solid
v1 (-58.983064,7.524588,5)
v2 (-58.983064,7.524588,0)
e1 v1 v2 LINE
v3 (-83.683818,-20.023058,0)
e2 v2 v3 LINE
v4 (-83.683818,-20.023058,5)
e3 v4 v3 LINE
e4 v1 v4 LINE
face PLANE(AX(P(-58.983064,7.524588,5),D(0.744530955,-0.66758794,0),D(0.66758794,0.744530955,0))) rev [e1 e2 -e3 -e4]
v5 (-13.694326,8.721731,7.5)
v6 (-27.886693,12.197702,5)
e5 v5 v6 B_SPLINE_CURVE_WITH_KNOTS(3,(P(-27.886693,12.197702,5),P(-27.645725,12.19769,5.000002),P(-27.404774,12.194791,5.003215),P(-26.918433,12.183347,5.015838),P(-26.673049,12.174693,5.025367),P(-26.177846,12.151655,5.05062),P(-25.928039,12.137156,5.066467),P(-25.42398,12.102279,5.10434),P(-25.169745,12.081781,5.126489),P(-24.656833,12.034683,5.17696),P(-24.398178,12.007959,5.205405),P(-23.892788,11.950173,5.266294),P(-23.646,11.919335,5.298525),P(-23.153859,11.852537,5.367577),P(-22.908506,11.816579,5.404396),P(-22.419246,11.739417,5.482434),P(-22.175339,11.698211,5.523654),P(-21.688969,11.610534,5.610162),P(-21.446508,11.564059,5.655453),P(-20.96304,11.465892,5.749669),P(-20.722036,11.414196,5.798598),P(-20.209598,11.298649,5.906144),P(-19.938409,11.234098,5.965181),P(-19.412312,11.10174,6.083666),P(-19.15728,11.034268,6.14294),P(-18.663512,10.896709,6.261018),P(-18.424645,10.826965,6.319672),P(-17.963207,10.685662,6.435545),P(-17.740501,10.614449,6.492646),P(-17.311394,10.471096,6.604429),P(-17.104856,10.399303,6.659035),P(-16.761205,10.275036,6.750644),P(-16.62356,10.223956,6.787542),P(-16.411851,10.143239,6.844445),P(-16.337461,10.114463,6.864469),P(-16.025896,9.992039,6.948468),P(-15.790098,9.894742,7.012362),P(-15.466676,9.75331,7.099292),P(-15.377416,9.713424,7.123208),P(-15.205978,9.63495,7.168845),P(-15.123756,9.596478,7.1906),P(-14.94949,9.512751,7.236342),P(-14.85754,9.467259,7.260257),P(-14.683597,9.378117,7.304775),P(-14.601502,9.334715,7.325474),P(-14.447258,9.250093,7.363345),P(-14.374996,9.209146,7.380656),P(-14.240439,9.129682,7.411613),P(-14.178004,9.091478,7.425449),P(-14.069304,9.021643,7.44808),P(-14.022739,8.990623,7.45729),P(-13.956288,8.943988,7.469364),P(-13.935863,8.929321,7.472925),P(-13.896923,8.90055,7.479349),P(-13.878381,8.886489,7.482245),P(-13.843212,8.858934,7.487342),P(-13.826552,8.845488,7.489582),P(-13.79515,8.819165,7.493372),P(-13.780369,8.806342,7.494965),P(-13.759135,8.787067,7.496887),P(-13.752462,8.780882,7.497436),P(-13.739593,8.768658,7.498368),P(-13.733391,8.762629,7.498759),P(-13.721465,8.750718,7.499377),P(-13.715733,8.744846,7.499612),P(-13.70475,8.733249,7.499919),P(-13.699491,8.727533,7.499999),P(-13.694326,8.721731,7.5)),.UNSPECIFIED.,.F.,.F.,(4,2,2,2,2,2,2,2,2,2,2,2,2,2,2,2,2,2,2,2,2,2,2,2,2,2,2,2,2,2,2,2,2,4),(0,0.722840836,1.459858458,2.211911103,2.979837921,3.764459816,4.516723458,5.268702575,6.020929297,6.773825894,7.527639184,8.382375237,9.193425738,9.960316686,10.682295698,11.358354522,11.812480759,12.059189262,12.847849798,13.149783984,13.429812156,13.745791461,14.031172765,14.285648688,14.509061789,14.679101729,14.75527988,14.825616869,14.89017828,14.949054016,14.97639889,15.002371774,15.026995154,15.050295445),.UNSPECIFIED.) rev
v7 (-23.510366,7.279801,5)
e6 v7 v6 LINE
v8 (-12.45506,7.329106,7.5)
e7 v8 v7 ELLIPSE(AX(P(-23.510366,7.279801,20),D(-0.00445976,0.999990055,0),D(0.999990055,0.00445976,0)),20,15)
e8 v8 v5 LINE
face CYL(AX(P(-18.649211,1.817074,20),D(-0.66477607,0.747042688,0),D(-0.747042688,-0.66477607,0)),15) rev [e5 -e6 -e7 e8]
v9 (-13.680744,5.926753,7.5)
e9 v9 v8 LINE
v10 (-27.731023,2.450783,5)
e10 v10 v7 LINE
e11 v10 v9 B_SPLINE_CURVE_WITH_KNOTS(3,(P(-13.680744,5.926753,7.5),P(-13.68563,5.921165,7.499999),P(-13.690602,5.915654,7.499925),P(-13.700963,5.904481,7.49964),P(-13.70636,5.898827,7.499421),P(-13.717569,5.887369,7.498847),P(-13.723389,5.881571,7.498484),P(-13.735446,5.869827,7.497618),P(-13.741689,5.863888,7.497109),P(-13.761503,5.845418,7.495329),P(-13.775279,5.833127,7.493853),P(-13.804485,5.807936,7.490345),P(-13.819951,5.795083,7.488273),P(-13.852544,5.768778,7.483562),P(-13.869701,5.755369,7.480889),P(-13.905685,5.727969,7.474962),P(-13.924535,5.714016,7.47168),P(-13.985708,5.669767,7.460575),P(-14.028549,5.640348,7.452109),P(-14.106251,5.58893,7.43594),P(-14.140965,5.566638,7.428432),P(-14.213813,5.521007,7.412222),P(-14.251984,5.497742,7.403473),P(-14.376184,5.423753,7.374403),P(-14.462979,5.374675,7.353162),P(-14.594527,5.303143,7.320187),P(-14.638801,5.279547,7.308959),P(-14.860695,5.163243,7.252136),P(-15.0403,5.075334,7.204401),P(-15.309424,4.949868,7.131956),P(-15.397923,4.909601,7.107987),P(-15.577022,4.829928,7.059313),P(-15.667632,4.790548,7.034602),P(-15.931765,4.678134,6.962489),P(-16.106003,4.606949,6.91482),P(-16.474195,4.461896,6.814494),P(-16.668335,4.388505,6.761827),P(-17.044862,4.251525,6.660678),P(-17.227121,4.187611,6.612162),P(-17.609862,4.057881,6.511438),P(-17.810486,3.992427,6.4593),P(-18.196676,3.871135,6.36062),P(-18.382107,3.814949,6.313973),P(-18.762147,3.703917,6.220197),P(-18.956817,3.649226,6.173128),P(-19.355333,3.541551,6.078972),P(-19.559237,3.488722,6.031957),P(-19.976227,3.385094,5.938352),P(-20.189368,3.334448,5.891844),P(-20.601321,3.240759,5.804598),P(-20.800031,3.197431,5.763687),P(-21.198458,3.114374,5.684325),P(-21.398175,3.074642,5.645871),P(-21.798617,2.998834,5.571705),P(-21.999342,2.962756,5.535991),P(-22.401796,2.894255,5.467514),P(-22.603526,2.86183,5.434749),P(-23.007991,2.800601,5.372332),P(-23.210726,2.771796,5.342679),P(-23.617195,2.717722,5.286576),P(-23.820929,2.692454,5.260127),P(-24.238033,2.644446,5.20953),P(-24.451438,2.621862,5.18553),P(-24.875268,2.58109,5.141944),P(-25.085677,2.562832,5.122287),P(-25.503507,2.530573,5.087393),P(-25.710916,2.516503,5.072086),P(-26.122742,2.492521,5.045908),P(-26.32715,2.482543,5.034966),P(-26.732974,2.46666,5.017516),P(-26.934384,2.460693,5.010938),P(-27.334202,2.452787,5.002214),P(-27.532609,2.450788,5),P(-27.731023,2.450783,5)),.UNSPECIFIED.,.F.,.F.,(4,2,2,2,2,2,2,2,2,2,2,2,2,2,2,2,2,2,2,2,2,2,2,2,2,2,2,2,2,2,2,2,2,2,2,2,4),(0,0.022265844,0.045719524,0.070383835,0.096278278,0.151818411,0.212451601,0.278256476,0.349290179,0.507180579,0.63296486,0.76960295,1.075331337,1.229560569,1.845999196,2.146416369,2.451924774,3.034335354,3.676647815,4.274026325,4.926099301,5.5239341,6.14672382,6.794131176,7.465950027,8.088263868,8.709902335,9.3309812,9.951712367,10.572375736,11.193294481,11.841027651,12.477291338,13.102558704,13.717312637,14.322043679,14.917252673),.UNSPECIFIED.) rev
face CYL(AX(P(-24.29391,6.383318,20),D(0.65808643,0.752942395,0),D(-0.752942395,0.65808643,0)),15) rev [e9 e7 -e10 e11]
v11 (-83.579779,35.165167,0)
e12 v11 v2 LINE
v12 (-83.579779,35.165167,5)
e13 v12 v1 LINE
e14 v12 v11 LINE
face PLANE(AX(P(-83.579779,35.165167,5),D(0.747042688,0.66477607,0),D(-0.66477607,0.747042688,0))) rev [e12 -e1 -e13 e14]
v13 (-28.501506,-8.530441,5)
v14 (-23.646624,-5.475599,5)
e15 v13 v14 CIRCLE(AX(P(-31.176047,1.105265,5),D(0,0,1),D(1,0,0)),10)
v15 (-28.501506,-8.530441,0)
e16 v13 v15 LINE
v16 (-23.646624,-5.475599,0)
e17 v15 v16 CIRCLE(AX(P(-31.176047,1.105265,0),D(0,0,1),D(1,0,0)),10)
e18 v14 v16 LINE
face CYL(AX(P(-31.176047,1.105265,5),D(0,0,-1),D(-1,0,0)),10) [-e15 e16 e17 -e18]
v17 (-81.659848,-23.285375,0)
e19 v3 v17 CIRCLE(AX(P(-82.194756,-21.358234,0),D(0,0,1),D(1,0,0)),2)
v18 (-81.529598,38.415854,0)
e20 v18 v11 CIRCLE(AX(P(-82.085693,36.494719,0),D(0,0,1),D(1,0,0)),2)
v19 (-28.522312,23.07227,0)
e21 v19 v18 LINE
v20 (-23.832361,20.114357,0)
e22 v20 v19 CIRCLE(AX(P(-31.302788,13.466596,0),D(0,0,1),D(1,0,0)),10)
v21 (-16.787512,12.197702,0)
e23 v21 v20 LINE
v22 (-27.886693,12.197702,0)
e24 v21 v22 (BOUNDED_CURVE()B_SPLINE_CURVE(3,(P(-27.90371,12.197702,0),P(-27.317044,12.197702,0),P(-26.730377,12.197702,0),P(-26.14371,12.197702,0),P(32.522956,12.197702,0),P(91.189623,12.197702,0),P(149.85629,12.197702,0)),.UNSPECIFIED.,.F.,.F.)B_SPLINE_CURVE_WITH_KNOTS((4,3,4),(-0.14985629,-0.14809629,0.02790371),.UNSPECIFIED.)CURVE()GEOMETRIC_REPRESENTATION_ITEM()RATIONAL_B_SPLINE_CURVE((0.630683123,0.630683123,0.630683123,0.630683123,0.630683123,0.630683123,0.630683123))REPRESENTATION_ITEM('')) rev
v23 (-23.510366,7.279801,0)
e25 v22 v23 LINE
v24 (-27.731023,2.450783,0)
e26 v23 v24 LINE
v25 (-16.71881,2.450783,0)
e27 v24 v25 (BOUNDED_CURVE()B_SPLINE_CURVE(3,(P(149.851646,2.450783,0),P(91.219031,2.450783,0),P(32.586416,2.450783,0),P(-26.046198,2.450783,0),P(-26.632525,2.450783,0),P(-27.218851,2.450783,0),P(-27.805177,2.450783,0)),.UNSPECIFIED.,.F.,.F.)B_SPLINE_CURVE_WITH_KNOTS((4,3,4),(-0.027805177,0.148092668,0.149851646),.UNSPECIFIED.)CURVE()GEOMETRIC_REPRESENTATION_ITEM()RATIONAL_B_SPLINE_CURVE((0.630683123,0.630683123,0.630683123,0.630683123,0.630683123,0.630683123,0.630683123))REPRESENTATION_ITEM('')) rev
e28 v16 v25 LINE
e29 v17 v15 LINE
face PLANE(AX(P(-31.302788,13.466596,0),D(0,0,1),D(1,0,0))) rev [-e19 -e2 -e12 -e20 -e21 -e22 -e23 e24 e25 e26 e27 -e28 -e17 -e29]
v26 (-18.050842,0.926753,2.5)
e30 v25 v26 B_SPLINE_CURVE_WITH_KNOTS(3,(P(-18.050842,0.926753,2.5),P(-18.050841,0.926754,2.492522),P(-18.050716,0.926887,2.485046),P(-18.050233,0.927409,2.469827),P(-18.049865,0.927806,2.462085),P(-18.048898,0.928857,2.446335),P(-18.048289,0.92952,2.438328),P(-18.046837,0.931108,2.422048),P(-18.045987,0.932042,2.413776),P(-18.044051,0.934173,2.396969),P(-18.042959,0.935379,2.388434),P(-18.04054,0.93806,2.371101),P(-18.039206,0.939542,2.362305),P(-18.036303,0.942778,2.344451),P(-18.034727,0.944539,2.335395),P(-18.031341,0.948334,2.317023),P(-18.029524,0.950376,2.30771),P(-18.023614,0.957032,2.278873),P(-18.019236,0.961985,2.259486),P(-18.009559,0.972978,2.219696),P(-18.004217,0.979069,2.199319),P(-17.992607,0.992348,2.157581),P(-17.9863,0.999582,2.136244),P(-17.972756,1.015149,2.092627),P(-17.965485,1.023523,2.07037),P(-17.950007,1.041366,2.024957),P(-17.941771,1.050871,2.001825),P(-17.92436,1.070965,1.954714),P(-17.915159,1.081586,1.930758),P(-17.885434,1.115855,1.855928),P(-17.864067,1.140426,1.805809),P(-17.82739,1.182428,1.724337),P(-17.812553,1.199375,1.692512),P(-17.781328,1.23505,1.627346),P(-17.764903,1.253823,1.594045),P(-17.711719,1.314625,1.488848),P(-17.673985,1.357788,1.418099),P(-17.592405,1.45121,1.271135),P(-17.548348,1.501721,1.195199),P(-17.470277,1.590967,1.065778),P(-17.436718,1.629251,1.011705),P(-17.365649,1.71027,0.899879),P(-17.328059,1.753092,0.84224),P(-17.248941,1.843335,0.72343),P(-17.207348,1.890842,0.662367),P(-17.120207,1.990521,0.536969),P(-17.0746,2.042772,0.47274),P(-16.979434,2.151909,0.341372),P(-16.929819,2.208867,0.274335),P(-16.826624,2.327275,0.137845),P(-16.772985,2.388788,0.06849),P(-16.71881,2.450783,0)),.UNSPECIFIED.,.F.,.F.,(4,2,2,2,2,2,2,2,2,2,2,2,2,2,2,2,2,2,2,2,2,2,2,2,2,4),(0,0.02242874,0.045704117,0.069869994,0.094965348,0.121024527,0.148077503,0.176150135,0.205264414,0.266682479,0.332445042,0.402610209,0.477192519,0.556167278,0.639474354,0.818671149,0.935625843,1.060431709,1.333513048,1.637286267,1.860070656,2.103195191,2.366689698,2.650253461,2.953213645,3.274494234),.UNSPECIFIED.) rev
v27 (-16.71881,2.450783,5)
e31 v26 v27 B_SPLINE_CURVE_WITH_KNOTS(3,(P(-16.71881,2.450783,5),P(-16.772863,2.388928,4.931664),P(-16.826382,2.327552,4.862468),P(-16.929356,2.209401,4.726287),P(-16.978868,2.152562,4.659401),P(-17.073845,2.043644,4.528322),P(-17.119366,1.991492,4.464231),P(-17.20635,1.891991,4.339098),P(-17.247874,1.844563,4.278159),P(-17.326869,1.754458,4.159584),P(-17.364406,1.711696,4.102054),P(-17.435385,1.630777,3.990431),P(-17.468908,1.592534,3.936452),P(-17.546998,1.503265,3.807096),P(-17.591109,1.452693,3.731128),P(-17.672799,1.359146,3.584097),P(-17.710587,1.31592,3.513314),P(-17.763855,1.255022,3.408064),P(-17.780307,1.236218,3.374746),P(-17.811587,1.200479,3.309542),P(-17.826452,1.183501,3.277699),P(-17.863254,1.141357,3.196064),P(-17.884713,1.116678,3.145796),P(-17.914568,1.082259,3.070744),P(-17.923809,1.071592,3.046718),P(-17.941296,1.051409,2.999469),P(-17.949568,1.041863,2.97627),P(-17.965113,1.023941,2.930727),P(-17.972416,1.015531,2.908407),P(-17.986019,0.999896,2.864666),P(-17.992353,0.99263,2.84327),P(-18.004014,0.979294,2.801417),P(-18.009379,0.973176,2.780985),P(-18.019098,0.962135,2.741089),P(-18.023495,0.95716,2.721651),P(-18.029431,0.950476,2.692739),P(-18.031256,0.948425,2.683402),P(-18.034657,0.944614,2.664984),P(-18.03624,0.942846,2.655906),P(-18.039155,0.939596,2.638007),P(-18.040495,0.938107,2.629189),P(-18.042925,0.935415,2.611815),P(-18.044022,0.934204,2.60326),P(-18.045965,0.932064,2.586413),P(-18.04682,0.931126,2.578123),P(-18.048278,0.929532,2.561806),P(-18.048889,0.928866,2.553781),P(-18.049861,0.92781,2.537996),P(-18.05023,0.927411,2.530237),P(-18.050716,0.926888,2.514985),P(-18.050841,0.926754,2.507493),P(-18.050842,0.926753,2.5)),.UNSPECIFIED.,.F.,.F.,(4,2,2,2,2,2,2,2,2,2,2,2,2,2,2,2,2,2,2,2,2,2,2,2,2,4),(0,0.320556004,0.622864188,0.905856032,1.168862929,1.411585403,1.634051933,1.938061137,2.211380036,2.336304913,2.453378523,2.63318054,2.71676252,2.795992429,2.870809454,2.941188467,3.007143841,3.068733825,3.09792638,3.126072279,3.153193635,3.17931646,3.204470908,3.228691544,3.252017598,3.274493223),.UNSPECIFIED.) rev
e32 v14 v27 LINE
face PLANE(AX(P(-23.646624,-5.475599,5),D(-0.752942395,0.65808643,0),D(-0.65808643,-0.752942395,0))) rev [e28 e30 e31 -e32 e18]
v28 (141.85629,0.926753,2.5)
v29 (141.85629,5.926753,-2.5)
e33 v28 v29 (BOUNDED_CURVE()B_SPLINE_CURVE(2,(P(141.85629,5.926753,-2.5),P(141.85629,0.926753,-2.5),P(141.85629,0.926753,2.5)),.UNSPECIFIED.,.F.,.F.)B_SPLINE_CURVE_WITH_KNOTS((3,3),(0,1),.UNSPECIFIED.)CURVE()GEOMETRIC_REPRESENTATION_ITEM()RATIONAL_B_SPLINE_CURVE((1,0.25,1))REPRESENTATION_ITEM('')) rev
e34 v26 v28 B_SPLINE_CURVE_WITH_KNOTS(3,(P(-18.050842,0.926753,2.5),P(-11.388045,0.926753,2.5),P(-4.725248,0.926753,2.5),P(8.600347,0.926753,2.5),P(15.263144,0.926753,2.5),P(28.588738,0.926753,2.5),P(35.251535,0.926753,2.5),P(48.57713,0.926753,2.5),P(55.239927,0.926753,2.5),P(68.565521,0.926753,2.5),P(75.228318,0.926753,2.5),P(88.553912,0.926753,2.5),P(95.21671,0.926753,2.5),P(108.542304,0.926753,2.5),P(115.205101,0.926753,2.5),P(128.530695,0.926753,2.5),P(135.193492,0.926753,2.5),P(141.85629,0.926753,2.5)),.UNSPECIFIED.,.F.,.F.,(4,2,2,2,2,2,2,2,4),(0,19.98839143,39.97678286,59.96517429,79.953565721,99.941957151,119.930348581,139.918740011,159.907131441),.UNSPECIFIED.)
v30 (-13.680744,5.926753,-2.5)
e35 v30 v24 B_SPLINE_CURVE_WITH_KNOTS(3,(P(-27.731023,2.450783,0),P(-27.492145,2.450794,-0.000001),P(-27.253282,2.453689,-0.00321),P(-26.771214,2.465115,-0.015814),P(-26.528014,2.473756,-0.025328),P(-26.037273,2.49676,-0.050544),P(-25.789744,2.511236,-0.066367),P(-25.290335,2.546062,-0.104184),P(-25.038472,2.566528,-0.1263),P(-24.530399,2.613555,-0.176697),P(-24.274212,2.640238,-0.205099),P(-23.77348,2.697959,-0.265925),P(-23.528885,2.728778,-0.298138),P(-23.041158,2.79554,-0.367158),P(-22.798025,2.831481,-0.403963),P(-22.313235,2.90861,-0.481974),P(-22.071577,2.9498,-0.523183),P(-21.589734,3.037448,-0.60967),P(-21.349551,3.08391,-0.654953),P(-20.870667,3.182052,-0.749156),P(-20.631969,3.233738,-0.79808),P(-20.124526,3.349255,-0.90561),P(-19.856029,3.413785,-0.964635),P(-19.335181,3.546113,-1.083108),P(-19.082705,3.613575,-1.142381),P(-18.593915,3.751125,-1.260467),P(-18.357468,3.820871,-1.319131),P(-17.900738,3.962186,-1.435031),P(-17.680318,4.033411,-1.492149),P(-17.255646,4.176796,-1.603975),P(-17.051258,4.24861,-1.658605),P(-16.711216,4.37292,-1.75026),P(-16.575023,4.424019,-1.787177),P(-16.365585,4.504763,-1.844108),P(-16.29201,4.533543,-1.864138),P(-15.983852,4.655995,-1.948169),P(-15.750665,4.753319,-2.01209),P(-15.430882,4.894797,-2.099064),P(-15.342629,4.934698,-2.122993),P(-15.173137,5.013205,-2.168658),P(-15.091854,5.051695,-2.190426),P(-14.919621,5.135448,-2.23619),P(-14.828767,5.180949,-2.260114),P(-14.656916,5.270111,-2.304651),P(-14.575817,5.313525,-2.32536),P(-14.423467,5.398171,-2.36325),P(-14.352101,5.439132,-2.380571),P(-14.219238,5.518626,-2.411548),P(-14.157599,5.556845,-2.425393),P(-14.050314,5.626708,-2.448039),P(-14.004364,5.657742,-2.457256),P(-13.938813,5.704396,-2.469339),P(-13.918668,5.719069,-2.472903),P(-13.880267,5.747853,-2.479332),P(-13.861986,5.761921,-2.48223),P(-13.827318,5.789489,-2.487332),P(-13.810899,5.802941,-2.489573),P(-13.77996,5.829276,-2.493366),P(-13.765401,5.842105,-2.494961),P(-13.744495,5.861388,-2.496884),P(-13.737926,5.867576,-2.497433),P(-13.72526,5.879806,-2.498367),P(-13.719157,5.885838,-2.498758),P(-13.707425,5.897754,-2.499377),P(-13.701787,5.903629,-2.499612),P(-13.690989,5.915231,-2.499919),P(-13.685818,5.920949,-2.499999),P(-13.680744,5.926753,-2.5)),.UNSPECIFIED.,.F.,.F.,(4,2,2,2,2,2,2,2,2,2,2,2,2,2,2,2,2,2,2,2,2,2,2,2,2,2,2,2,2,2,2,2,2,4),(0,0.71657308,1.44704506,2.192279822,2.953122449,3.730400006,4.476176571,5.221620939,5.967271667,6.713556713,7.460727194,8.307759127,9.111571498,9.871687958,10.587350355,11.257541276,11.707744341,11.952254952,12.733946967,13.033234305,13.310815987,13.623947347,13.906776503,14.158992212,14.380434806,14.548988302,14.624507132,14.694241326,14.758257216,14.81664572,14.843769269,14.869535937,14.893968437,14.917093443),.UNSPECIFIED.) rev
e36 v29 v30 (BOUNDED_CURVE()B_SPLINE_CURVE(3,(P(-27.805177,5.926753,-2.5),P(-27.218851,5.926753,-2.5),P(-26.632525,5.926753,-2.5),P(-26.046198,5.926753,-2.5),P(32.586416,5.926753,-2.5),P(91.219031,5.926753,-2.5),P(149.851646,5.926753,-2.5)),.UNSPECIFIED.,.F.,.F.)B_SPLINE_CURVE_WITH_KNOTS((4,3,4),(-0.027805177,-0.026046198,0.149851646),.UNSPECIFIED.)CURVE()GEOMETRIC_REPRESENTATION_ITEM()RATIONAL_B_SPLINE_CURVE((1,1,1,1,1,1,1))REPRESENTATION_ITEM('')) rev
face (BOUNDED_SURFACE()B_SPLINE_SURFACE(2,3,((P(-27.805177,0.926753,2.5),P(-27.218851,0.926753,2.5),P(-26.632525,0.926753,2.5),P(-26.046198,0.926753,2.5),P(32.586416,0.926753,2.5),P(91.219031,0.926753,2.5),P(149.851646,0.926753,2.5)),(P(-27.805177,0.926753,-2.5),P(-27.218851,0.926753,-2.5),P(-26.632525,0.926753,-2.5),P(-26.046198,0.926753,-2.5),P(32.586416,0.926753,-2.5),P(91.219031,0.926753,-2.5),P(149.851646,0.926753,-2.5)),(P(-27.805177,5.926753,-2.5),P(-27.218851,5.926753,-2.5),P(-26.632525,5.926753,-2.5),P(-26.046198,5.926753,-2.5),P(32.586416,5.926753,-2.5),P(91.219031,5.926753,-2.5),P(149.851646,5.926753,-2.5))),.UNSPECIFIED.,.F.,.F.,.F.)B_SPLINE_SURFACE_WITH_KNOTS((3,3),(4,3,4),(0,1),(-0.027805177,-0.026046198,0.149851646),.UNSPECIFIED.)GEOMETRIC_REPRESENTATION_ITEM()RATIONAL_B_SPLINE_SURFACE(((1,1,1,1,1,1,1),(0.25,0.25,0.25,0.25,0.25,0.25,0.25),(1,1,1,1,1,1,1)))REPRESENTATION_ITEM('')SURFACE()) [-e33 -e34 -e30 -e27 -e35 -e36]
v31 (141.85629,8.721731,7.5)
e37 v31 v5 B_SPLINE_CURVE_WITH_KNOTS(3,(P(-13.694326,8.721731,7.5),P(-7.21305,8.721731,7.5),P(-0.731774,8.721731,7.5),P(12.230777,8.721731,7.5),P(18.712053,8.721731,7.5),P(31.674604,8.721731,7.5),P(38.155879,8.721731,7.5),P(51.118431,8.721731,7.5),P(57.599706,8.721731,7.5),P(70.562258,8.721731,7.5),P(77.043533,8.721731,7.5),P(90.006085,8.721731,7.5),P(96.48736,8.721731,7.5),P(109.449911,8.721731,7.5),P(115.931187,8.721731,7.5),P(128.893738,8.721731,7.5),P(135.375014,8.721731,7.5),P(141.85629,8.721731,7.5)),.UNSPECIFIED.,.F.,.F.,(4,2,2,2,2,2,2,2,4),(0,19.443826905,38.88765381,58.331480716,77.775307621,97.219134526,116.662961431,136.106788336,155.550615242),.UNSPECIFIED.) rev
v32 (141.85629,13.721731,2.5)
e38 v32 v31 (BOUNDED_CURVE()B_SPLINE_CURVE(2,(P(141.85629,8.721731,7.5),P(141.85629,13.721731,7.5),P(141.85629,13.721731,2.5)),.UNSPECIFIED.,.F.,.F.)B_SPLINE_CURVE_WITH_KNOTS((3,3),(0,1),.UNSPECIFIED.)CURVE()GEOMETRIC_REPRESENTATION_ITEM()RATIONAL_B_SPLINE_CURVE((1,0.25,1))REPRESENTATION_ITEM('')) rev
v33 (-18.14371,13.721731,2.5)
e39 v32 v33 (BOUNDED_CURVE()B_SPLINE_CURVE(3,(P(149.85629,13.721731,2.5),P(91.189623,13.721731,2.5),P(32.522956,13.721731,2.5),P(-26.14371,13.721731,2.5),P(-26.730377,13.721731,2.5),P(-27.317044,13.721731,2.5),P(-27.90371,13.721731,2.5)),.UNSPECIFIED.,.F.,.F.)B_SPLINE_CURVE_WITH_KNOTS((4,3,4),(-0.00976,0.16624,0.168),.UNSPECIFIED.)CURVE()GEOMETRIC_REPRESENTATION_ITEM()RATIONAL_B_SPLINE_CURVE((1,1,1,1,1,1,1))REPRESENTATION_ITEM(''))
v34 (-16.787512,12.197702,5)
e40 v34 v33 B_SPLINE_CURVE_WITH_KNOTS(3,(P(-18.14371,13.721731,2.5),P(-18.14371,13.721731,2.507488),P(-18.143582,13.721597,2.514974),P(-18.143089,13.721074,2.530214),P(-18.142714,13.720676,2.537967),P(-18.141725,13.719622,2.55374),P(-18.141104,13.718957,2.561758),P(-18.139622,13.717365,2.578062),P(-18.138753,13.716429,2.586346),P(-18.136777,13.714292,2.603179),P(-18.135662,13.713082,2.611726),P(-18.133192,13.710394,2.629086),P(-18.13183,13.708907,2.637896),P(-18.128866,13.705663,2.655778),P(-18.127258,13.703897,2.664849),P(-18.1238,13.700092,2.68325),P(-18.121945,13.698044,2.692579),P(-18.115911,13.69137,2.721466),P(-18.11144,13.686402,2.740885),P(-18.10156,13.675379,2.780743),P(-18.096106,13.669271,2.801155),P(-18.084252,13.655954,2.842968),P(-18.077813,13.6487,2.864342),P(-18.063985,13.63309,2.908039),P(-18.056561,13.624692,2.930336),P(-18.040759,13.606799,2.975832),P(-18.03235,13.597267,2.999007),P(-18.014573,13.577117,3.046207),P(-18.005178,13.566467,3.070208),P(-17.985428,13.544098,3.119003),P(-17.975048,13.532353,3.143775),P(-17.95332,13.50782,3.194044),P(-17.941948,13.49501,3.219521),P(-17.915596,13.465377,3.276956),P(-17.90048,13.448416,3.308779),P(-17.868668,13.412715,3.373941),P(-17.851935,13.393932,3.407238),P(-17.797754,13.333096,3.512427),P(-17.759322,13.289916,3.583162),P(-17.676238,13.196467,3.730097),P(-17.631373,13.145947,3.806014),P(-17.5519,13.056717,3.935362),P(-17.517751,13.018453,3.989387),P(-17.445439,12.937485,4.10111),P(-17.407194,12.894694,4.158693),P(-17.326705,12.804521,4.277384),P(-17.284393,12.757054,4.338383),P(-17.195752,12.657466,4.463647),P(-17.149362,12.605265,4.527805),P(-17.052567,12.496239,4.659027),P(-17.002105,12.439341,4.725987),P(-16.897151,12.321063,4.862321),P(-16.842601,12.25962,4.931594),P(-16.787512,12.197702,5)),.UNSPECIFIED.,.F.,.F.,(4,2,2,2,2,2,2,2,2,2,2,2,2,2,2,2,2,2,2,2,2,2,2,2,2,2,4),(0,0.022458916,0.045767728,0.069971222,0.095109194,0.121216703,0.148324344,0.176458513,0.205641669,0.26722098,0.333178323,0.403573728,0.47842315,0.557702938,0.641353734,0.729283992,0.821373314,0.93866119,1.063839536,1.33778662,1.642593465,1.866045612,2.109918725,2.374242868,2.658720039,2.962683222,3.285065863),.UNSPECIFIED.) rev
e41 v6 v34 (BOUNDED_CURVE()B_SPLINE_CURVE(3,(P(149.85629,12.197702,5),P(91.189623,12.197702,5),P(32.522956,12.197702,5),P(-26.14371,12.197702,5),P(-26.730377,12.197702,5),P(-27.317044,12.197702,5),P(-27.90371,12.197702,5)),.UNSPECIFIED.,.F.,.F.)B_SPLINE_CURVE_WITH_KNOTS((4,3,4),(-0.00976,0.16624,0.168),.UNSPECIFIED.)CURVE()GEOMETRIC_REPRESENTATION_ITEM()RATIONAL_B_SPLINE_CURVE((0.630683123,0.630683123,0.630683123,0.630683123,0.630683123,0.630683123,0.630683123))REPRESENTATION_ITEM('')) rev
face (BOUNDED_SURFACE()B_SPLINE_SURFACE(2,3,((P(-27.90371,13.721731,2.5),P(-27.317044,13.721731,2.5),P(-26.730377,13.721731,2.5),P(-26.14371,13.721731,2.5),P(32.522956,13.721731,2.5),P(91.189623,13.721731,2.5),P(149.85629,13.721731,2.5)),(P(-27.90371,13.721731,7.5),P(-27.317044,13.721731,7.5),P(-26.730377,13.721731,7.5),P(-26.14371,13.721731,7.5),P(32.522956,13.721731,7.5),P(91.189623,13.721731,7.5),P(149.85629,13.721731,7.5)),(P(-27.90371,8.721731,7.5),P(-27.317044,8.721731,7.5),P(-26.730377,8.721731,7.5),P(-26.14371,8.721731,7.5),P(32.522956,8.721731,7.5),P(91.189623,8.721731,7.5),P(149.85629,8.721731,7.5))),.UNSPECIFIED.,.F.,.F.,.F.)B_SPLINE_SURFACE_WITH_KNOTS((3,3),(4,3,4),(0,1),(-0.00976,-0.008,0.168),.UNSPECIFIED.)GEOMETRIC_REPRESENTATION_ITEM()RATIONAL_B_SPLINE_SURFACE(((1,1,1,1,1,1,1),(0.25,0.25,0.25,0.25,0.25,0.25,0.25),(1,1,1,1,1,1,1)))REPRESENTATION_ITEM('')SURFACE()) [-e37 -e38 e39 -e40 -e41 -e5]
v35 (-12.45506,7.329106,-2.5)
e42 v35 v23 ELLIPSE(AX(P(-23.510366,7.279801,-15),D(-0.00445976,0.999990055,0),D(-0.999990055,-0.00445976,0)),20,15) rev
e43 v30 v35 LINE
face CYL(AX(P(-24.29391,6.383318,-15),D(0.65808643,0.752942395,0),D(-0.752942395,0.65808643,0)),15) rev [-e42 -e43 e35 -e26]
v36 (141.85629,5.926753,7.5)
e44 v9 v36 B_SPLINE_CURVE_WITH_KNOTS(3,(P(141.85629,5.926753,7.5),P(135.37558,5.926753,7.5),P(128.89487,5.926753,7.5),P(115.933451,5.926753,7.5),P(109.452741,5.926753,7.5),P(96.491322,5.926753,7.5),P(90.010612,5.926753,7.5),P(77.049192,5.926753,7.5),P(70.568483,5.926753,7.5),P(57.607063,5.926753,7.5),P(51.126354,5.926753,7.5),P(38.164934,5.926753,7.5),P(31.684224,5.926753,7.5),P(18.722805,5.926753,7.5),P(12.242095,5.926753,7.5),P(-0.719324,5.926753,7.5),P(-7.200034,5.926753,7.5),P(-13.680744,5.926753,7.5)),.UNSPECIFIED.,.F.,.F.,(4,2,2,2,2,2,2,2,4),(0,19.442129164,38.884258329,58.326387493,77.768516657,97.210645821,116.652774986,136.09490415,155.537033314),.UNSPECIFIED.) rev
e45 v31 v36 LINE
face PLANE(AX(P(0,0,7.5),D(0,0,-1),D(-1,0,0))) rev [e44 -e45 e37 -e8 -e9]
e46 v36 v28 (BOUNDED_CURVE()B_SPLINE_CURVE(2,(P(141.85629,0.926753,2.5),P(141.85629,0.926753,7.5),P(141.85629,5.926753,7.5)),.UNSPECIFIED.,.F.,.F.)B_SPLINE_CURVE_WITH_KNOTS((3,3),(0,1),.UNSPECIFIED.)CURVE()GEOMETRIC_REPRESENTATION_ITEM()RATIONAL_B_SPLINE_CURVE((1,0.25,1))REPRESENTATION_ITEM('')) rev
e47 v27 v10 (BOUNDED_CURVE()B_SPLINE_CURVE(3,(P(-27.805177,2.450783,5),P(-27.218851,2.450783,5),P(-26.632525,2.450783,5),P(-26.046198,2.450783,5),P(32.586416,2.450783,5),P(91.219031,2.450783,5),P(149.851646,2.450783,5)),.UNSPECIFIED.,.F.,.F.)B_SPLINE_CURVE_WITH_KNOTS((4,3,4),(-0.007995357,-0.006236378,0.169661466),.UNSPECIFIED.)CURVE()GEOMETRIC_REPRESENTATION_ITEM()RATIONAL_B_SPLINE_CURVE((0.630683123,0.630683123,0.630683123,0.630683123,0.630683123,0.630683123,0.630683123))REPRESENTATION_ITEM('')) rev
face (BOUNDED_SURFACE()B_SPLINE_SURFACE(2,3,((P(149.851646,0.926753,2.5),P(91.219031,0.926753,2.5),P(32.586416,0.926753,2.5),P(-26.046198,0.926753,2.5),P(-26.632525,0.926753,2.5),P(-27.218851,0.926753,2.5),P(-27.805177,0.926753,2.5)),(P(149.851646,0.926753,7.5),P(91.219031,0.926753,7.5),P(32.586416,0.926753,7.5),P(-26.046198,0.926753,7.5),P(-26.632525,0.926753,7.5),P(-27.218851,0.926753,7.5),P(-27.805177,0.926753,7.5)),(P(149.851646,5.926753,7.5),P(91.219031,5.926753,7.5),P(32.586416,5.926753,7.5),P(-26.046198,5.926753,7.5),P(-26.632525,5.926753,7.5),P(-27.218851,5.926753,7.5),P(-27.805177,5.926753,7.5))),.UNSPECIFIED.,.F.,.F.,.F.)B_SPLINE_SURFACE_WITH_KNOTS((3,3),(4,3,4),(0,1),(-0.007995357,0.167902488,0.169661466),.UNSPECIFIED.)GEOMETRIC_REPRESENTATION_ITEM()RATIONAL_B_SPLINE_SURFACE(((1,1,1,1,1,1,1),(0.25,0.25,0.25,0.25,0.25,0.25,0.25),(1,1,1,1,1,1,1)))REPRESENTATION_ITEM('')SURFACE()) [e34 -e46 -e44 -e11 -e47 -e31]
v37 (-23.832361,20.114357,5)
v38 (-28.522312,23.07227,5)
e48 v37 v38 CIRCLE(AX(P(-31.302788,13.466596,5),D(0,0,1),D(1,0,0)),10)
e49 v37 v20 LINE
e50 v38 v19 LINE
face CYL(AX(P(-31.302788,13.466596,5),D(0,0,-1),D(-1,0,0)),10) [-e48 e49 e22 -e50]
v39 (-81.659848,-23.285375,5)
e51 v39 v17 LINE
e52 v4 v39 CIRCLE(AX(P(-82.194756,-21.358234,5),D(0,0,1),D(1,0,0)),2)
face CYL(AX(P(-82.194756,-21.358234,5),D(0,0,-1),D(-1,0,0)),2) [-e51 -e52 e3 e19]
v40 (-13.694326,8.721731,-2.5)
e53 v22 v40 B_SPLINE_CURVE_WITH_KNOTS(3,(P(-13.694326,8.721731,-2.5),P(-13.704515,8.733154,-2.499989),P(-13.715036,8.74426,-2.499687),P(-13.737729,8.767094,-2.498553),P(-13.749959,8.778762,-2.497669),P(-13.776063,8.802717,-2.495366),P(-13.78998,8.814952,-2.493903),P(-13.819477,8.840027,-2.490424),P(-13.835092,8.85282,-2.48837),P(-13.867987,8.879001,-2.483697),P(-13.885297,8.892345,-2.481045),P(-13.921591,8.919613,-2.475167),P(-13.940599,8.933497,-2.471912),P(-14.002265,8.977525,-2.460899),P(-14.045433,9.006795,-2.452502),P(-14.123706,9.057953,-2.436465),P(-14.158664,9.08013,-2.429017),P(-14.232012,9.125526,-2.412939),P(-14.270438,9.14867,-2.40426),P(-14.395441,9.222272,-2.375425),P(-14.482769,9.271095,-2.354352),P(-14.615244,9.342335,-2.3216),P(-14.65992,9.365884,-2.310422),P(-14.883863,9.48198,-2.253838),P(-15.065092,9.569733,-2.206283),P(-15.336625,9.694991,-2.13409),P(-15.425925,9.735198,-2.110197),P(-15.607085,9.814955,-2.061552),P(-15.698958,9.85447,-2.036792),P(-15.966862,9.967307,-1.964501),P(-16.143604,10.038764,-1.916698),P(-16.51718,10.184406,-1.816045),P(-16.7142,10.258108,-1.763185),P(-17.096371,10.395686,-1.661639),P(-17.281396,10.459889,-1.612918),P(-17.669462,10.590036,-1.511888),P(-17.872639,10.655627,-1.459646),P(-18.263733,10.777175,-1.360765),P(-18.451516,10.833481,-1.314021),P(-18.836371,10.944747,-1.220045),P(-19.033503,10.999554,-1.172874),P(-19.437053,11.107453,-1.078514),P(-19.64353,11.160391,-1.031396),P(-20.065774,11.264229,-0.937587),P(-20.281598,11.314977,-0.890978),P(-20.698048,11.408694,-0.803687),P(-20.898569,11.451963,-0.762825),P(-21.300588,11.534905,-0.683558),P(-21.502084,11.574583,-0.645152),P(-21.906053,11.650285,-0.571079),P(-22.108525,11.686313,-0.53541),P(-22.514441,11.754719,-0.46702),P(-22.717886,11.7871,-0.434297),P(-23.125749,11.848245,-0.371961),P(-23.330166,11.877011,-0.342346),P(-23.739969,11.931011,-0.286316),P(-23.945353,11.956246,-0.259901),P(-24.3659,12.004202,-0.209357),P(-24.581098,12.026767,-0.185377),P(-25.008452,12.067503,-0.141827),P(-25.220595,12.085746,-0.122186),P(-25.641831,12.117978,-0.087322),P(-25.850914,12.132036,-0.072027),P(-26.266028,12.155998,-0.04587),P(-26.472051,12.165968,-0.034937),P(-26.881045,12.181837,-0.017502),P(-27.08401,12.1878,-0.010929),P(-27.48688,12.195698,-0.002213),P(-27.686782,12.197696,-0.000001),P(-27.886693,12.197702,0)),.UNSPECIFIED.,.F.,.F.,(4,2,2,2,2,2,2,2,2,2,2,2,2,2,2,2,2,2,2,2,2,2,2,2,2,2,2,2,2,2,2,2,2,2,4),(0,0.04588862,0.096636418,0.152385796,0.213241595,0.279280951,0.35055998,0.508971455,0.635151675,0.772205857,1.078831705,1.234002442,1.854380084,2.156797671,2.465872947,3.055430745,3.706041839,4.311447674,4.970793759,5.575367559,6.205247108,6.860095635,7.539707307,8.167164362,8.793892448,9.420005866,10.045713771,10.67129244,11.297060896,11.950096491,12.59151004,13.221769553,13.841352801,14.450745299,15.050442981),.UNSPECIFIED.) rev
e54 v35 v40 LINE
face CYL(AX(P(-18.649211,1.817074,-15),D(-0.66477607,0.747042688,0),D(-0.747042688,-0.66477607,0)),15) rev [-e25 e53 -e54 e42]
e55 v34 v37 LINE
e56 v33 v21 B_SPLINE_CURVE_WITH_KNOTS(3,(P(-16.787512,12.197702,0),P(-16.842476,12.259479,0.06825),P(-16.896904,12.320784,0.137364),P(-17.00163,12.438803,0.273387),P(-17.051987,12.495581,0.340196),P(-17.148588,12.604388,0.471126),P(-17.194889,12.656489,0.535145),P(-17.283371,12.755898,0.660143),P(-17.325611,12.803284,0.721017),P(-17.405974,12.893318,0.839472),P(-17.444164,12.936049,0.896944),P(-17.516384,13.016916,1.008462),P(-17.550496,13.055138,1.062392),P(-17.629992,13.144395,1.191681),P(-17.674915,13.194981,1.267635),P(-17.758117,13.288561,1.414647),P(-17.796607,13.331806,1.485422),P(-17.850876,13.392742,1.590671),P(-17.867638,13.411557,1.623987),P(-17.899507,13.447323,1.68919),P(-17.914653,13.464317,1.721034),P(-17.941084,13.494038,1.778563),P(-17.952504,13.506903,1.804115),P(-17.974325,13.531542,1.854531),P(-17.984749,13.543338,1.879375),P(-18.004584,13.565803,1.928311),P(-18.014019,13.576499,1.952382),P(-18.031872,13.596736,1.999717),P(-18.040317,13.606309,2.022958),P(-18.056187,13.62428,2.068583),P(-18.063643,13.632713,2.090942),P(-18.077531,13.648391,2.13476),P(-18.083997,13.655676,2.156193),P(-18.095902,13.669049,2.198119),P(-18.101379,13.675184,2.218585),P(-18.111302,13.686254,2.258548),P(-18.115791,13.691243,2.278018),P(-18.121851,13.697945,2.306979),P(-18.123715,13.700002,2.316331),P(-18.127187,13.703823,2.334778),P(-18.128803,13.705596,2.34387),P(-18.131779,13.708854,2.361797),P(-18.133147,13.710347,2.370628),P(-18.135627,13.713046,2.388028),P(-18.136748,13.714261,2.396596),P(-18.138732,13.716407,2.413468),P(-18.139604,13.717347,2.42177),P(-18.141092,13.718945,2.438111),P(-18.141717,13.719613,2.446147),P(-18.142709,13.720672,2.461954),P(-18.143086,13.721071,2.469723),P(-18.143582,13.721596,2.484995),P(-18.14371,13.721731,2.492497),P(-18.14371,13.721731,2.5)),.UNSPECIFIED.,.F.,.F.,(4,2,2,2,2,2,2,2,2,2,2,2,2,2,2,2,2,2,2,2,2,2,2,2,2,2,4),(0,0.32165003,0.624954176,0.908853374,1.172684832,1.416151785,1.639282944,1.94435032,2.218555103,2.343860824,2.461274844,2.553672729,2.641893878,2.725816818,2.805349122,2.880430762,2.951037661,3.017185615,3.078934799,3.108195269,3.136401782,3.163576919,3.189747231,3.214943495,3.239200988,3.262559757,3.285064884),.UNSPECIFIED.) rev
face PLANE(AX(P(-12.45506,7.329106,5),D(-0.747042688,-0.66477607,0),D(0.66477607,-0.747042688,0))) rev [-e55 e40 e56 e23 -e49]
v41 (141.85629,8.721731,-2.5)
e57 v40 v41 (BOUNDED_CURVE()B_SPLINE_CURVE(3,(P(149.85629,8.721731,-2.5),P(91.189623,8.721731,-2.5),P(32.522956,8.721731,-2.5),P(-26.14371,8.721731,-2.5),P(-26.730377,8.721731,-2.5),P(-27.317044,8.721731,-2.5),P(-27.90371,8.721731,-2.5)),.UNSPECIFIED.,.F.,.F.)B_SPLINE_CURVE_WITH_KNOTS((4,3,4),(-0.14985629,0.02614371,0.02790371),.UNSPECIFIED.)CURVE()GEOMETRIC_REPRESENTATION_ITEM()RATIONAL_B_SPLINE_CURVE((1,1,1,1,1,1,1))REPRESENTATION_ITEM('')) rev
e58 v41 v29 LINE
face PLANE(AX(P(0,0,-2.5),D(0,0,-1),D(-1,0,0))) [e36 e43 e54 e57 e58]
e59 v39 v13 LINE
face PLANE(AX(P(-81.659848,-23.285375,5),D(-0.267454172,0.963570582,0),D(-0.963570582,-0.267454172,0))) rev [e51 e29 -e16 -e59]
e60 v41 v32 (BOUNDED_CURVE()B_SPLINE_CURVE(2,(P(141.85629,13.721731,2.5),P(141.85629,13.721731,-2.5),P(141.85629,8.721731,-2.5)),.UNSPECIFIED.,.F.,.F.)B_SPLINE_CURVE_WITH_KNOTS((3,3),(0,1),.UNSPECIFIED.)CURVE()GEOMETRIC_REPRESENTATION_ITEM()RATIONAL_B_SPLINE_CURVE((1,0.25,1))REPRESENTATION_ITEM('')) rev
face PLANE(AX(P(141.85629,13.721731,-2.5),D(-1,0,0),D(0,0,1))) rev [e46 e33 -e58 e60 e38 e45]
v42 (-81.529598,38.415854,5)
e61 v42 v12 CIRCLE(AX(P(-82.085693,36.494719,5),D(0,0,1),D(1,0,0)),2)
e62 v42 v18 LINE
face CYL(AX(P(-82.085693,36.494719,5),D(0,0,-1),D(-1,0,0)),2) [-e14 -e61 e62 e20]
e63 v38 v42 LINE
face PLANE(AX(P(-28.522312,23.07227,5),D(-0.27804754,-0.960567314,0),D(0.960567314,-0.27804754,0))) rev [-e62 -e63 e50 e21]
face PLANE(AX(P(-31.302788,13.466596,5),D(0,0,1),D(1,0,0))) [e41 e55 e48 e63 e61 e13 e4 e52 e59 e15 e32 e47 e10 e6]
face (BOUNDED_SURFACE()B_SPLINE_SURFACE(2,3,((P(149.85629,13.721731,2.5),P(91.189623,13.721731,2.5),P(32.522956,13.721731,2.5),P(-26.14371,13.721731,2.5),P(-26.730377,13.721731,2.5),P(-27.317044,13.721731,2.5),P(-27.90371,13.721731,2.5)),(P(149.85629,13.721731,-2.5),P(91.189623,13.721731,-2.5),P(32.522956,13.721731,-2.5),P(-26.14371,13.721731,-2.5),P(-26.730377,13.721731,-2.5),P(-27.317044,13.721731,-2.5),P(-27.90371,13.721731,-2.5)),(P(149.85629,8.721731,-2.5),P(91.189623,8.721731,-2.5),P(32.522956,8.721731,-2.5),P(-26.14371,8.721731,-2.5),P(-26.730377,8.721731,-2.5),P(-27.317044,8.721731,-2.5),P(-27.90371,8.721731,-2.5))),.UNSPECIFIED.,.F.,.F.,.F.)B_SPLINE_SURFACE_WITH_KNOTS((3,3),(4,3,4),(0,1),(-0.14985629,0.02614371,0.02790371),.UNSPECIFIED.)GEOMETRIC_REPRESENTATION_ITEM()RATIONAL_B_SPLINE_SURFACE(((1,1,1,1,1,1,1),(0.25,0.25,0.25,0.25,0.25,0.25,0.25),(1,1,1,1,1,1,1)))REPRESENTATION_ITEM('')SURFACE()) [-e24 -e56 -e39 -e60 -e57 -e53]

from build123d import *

# Parameters (mm, degrees)
BOSS_EXTRU_1_DEPTH = 5
BOSS_EXTRU_3_START = 7.5
BOSS_EXTRU_3_DEPTH = 10
CONG_8_R           = 15
CONG_9_SIZE        = 5


with BuildPart() as part:
    # Esquisse1 → Boss.-Extru.1 (new body)
    with BuildSketch(Plane.XY):
        with BuildLine():
            Line((-12.455060077, 7.329105625), (-23.832360657, 20.114357067))
            ThreePointArc((-23.832360657, 20.114357067), (-25.968224675, 21.924872738), (-28.522312132, 23.072269514))
            Line((-28.522312132, 23.072269514), (-81.529598126, 38.415853733))
            ThreePointArc((-81.529598126, 38.415853733), (-83.77734848, 37.561631676), (-83.579778581, 35.165166965))
            Line((-83.579778581, 35.165166965), (-58.983064004, 7.524587521))
            Line((-58.983064004, 7.524587521), (-83.683817787, -20.023057796))
            ThreePointArc((-83.683817787, -20.023057796), (-83.894250032, -22.412614831), (-81.659847534, -23.285374839))
            Line((-81.659847534, -23.285374839), (-28.501505769, -8.530440884))
            ThreePointArc((-28.501505769, -8.530440884), (-25.85033223, -7.358585076), (-23.646623539, -5.475599369))
            Line((-23.646623539, -5.475599369), (-12.455060077, 7.329105625))
        make_face()
    extrude(amount=BOSS_EXTRU_1_DEPTH)

    # Esquisse2 → Boss.-Extru.3 (add)
    with BuildSketch(Plane.XY.offset(BOSS_EXTRU_3_START)):
        Polygon((-18.143710367, 13.721731346), (141.856289633, 13.721731346), (141.856289633, 0.926753128), (-18.050841808, 0.926753128), (-12.455060077, 7.329105625), align=None)
    extrude(amount=-BOSS_EXTRU_3_DEPTH)

    # Congé8
    # the kernel refuses this fillet: 15 mm, written as the material it adds along each edge
    with BuildSketch(Plane(origin=(-31.692252861, -14.680918207, 5), x_dir=(-0.7529423951680033, 0.6580864301584334, 0), z_dir=(0.6580864301584333, 0.7529423951680033, 0))) as cong_8_piece_1_section:
        with BuildLine():
            CenterArc((8.291561976, 15), CONG_8_R, 236.442690238, 33.557309762)
            Line((0, 2.5), (0, 0))
            Line((0, 0), (8.291561976, 0))
        make_face()
    cong_8_piece_1 = extrude(amount=49.960920527, mode=Mode.PRIVATE)
    cong_8_piece_1 = split(cong_8_piece_1, bisect_by=Plane(origin=(-31.692252861, 0.926753128, 5), z_dir=(0, 1, 0)), keep=Keep.TOP, mode=Mode.PRIVATE)
    cong_8_piece_1 = split(cong_8_piece_1, bisect_by=Plane(origin=(-31.692252861, 13.721731346, 5), z_dir=(0, -1, 0)), keep=Keep.TOP, mode=Mode.PRIVATE)
    add(cong_8_piece_1)
    with BuildSketch(Plane(origin=(1.325019877, -8.156271234, 5), x_dir=(-0.7470426876655595, -0.6647760696696423, 0), z_dir=(-0.6647760696696423, 0.7470426876655596, 0))) as cong_8_piece_2_section:
        with BuildLine():
            CenterArc((8.291561976, 15), CONG_8_R, 236.442690238, 33.557309762)
            Line((0, 2.5), (0, 0))
            Line((0, 0), (8.291561976, 0))
        make_face()
    cong_8_piece_2 = extrude(amount=50.015052761, mode=Mode.PRIVATE)
    cong_8_piece_2 = split(cong_8_piece_2, bisect_by=Plane(origin=(-14.160236459, 5.378146708, 5), z_dir=(-0.752942395168003, 0.6580864301584336, 0)), keep=Keep.TOP, mode=Mode.PRIVATE)
    cong_8_piece_2 = split(cong_8_piece_2, bisect_by=Plane(origin=(1.325019877, 13.721731346, 5), z_dir=(0, -1, 0)), keep=Keep.TOP, mode=Mode.PRIVATE)
    add(cong_8_piece_2)
    with BuildSketch(Plane(origin=(1.325019877, -8.156271234, 0), x_dir=(-0.7470426876655595, -0.6647760696696423, 0), z_dir=(-0.6647760696696423, 0.7470426876655596, 0))) as cong_8_piece_3_section:
        with BuildLine():
            CenterArc((8.291561976, -15), CONG_8_R, 90, 33.557309762)
            Line((0, -2.5), (0, 0))
            Line((0, 0), (8.291561976, 0))
        make_face()
    cong_8_piece_3 = extrude(amount=50.015052761, mode=Mode.PRIVATE)
    cong_8_piece_3 = split(cong_8_piece_3, bisect_by=Plane(origin=(-14.160236459, 5.378146708, 0), z_dir=(-0.752942395168003, 0.6580864301584336, 0)), keep=Keep.TOP, mode=Mode.PRIVATE)
    cong_8_piece_3 = split(cong_8_piece_3, bisect_by=Plane(origin=(1.325019877, 13.721731346, 0), z_dir=(0, -1, 0)), keep=Keep.TOP, mode=Mode.PRIVATE)
    add(cong_8_piece_3)
    with BuildSketch(Plane(origin=(-31.692252861, -14.680918207, 0), x_dir=(-0.7529423951680033, 0.6580864301584334, 0), z_dir=(0.6580864301584333, 0.7529423951680033, 0))) as cong_8_piece_4_section:
        with BuildLine():
            CenterArc((8.291561976, -15), CONG_8_R, 90, 33.557309762)
            Line((0, -2.5), (0, 0))
            Line((0, 0), (8.291561976, 0))
        make_face()
    cong_8_piece_4 = extrude(amount=49.960920527, mode=Mode.PRIVATE)
    cong_8_piece_4 = split(cong_8_piece_4, bisect_by=Plane(origin=(-31.692252861, 0.926753128, 0), z_dir=(0, 1, 0)), keep=Keep.TOP, mode=Mode.PRIVATE)
    cong_8_piece_4 = split(cong_8_piece_4, bisect_by=Plane(origin=(-31.692252861, 13.721731346, 0), z_dir=(0, -1, 0)), keep=Keep.TOP, mode=Mode.PRIVATE)
    add(cong_8_piece_4)

    # Congé9
    # a fillet whose section is not a circle: 5 mm, written as the material it takes off along each edge
    with BuildSketch(Plane(origin=(154.356289633, 0.926753128, 7.5), x_dir=(0, 1, 0), z_dir=(-1, 0, 0))) as cong_9_piece_1_section:
        with BuildLine():
            Bezier((CONG_9_SIZE, 0), (0, 0), (0, CONG_9_SIZE), weights=[1, 0.25, 1])
            Line((0, CONG_9_SIZE), (0, 0))
            Line((0, 0), (CONG_9_SIZE, 0))
        make_face()
    cong_9_piece_1 = extrude(amount=184.907131441, mode=Mode.PRIVATE)
    cong_9_piece_1 = split(cong_9_piece_1, bisect_by=Plane(origin=(154.356289633, 0.926753128, 5), z_dir=(0, 0, 1)), keep=Keep.TOP, mode=Mode.PRIVATE)
    cong_9_piece_1 = split(cong_9_piece_1, bisect_by=Plane(origin=(56.614850684, 86.354688982, 7.5), z_dir=(0.7529423951680033, -0.6580864301584333, 0)), keep=Keep.TOP, mode=Mode.PRIVATE)
    add(cong_9_piece_1, mode=Mode.SUBTRACT)
    with BuildSketch(Plane(origin=(154.356289633, 0.926753128, 7.5), x_dir=(0, 1, 0), z_dir=(-1, 0, 0))) as cong_9_piece_2_section:
        with BuildLine():
            Bezier((CONG_9_SIZE, 0), (0, 0), (0, CONG_9_SIZE), weights=[1, 0.25, 1])
            Line((0, CONG_9_SIZE), (0, 0))
            Line((0, 0), (CONG_9_SIZE, 0))
        make_face()
    cong_9_piece_2 = extrude(amount=184.907131441, mode=Mode.PRIVATE)
    cong_9_piece_2 = split(cong_9_piece_2, bisect_by=Plane(origin=(154.356289633, 0.926753128, 5), z_dir=(0, 0, -1)), keep=Keep.TOP, mode=Mode.PRIVATE)
    cong_9_piece_2 = split(cong_9_piece_2, bisect_by=Plane(origin=(56.614850684, 86.354688982, 7.5), z_dir=(0.7529423951680033, -0.6580864301584333, 0)), keep=Keep.TOP, mode=Mode.PRIVATE)
    add(cong_9_piece_2, mode=Mode.SUBTRACT)
    with BuildSketch(Plane(origin=(154.356289633, 0.926753128, 7.5), x_dir=(0, 1, 0), z_dir=(-1, 0, 0))) as cong_9_piece_3_section:
        with BuildLine():
            Bezier((CONG_9_SIZE, 0), (0, 0), (0, CONG_9_SIZE), weights=[1, 0.25, 1])
            Line((0, CONG_9_SIZE), (0, 0))
            Line((0, 0), (CONG_9_SIZE, 0))
        make_face()
    cong_9_piece_3 = extrude(amount=184.907131441, mode=Mode.PRIVATE)
    cong_9_piece_3 = split(cong_9_piece_3, bisect_by=Plane(origin=(154.356289633, 0.926753128, 5), z_dir=(0, 0, 1)), keep=Keep.TOP, mode=Mode.PRIVATE)
    cong_9_piece_3 = split(cong_9_piece_3, bisect_by=Plane(origin=(56.614850684, 86.354688982, 7.5), z_dir=(-0.7529423951680033, 0.6580864301584333, 0)), keep=Keep.TOP, mode=Mode.PRIVATE)
    add(cong_9_piece_3, mode=Mode.SUBTRACT)
    with BuildSketch(Plane(origin=(154.356289633, 13.721731346, 7.5), x_dir=(0, -1, 0), z_dir=(-1, 0, 0))) as cong_9_piece_4_section:
        with BuildLine():
            Bezier((CONG_9_SIZE, 0), (0, 0), (0, -CONG_9_SIZE), weights=[1, 0.25, 1])
            Line((0, -CONG_9_SIZE), (0, 0))
            Line((0, 0), (CONG_9_SIZE, 0))
        make_face()
    cong_9_piece_4 = extrude(amount=185, mode=Mode.PRIVATE)
    cong_9_piece_4 = split(cong_9_piece_4, bisect_by=Plane(origin=(154.356289633, 13.721731346, 5), z_dir=(0, 0, 1)), keep=Keep.TOP, mode=Mode.PRIVATE)
    cong_9_piece_4 = split(cong_9_piece_4, bisect_by=Plane(origin=(58.088735567, -71.944546211, 7.5), z_dir=(0.7470426876655596, 0.6647760696696423, 0)), keep=Keep.TOP, mode=Mode.PRIVATE)
    add(cong_9_piece_4, mode=Mode.SUBTRACT)
    with BuildSketch(Plane(origin=(154.356289633, 13.721731346, 7.5), x_dir=(0, -1, 0), z_dir=(-1, 0, 0))) as cong_9_piece_5_section:
        with BuildLine():
            Bezier((CONG_9_SIZE, 0), (0, 0), (0, -CONG_9_SIZE), weights=[1, 0.25, 1])
            Line((0, -CONG_9_SIZE), (0, 0))
            Line((0, 0), (CONG_9_SIZE, 0))
        make_face()
    cong_9_piece_5 = extrude(amount=185, mode=Mode.PRIVATE)
    cong_9_piece_5 = split(cong_9_piece_5, bisect_by=Plane(origin=(154.356289633, 13.721731346, 5), z_dir=(0, 0, -1)), keep=Keep.TOP, mode=Mode.PRIVATE)
    cong_9_piece_5 = split(cong_9_piece_5, bisect_by=Plane(origin=(58.088735567, -71.944546211, 7.5), z_dir=(0.7470426876655596, 0.6647760696696423, 0)), keep=Keep.TOP, mode=Mode.PRIVATE)
    add(cong_9_piece_5, mode=Mode.SUBTRACT)
    with BuildSketch(Plane(origin=(154.356289633, 13.721731346, 7.5), x_dir=(0, -1, 0), z_dir=(-1, 0, 0))) as cong_9_piece_6_section:
        with BuildLine():
            Bezier((CONG_9_SIZE, 0), (0, 0), (0, -CONG_9_SIZE), weights=[1, 0.25, 1])
            Line((0, -CONG_9_SIZE), (0, 0))
            Line((0, 0), (CONG_9_SIZE, 0))
        make_face()
    cong_9_piece_6 = extrude(amount=185, mode=Mode.PRIVATE)
    cong_9_piece_6 = split(cong_9_piece_6, bisect_by=Plane(origin=(154.356289633, 13.721731346, 5), z_dir=(0, 0, 1)), keep=Keep.TOP, mode=Mode.PRIVATE)
    cong_9_piece_6 = split(cong_9_piece_6, bisect_by=Plane(origin=(58.088735567, -71.944546211, 7.5), z_dir=(-0.7470426876655596, -0.6647760696696423, 0)), keep=Keep.TOP, mode=Mode.PRIVATE)
    add(cong_9_piece_6, mode=Mode.SUBTRACT)
    with BuildSketch(Plane(origin=(-30.643710367, 13.721731346, -2.5), x_dir=(0, 0, 1), z_dir=(1, 0, 0))) as cong_9_piece_7_section:
        with BuildLine():
            Bezier((CONG_9_SIZE, 0), (0, 0), (0, CONG_9_SIZE), weights=[1, 0.25, 1])
            Line((0, CONG_9_SIZE), (0, 0))
            Line((0, 0), (CONG_9_SIZE, 0))
        make_face()
    cong_9_piece_7 = extrude(amount=185, mode=Mode.PRIVATE)
    cong_9_piece_7 = split(cong_9_piece_7, bisect_by=Plane(origin=(-30.643710367, 13.721731346, 0), z_dir=(0, 0, -1)), keep=Keep.TOP, mode=Mode.PRIVATE)
    cong_9_piece_7 = split(cong_9_piece_7, bisect_by=Plane(origin=(-23.667800652, 19.929432618, -2.5), z_dir=(-0.7470426876655596, -0.6647760696696423, 0)), keep=Keep.TOP, mode=Mode.PRIVATE)
    add(cong_9_piece_7, mode=Mode.SUBTRACT)
    with BuildSketch(Plane(origin=(-30.643710367, 13.721731346, -2.5), x_dir=(0, 0, 1), z_dir=(1, 0, 0))) as cong_9_piece_8_section:
        with BuildLine():
            Bezier((CONG_9_SIZE, 0), (0, 0), (0, CONG_9_SIZE), weights=[1, 0.25, 1])
            Line((0, CONG_9_SIZE), (0, 0))
            Line((0, 0), (CONG_9_SIZE, 0))
        make_face()
    cong_9_piece_8 = extrude(amount=185, mode=Mode.PRIVATE)
    cong_9_piece_8 = split(cong_9_piece_8, bisect_by=Plane(origin=(-30.643710367, 13.721731346, 0), z_dir=(0, 0, 1)), keep=Keep.TOP, mode=Mode.PRIVATE)
    cong_9_piece_8 = split(cong_9_piece_8, bisect_by=Plane(origin=(-23.667800652, 19.929432618, -2.5), z_dir=(0.7470426876655596, 0.6647760696696423, 0)), keep=Keep.TOP, mode=Mode.PRIVATE)
    add(cong_9_piece_8, mode=Mode.SUBTRACT)
    with BuildSketch(Plane(origin=(-30.643710367, 13.721731346, -2.5), x_dir=(0, 0, 1), z_dir=(1, 0, 0))) as cong_9_piece_9_section:
        with BuildLine():
            Bezier((CONG_9_SIZE, 0), (0, 0), (0, CONG_9_SIZE), weights=[1, 0.25, 1])
            Line((0, CONG_9_SIZE), (0, 0))
            Line((0, 0), (CONG_9_SIZE, 0))
        make_face()
    cong_9_piece_9 = extrude(amount=185, mode=Mode.PRIVATE)
    cong_9_piece_9 = split(cong_9_piece_9, bisect_by=Plane(origin=(-30.643710367, 13.721731346, 0), z_dir=(0, 0, -1)), keep=Keep.TOP, mode=Mode.PRIVATE)
    cong_9_piece_9 = split(cong_9_piece_9, bisect_by=Plane(origin=(-23.667800652, 19.929432618, -2.5), z_dir=(0.7470426876655596, 0.6647760696696423, 0)), keep=Keep.TOP, mode=Mode.PRIVATE)
    add(cong_9_piece_9, mode=Mode.SUBTRACT)
    with BuildSketch(Plane(origin=(154.356289633, 0.926753128, -2.5), x_dir=(0, 1, 0), z_dir=(-1, 0, 0))) as cong_9_piece_10_section:
        with BuildLine():
            Bezier((CONG_9_SIZE, 0), (0, 0), (0, -CONG_9_SIZE), weights=[1, 0.25, 1])
            Line((0, -CONG_9_SIZE), (0, 0))
            Line((0, 0), (CONG_9_SIZE, 0))
        make_face()
    cong_9_piece_10 = extrude(amount=184.907131441, mode=Mode.PRIVATE)
    cong_9_piece_10 = split(cong_9_piece_10, bisect_by=Plane(origin=(154.356289633, 0.926753128, 0), z_dir=(0, 0, -1)), keep=Keep.TOP, mode=Mode.PRIVATE)
    cong_9_piece_10 = split(cong_9_piece_10, bisect_by=Plane(origin=(56.614850684, 86.354688982, -2.5), z_dir=(0.7529423951680033, -0.6580864301584333, 0)), keep=Keep.TOP, mode=Mode.PRIVATE)
    add(cong_9_piece_10, mode=Mode.SUBTRACT)
    with BuildSketch(Plane(origin=(154.356289633, 0.926753128, -2.5), x_dir=(0, 1, 0), z_dir=(-1, 0, 0))) as cong_9_piece_11_section:
        with BuildLine():
            Bezier((CONG_9_SIZE, 0), (0, 0), (0, -CONG_9_SIZE), weights=[1, 0.25, 1])
            Line((0, -CONG_9_SIZE), (0, 0))
            Line((0, 0), (CONG_9_SIZE, 0))
        make_face()
    cong_9_piece_11 = extrude(amount=184.907131441, mode=Mode.PRIVATE)
    cong_9_piece_11 = split(cong_9_piece_11, bisect_by=Plane(origin=(154.356289633, 0.926753128, 0), z_dir=(0, 0, 1)), keep=Keep.TOP, mode=Mode.PRIVATE)
    cong_9_piece_11 = split(cong_9_piece_11, bisect_by=Plane(origin=(56.614850684, 86.354688982, -2.5), z_dir=(0.7529423951680033, -0.6580864301584333, 0)), keep=Keep.TOP, mode=Mode.PRIVATE)
    add(cong_9_piece_11, mode=Mode.SUBTRACT)
    with BuildSketch(Plane(origin=(154.356289633, 0.926753128, -2.5), x_dir=(0, 1, 0), z_dir=(-1, 0, 0))) as cong_9_piece_12_section:
        with BuildLine():
            Bezier((CONG_9_SIZE, 0), (0, 0), (0, -CONG_9_SIZE), weights=[1, 0.25, 1])
            Line((0, -CONG_9_SIZE), (0, 0))
            Line((0, 0), (CONG_9_SIZE, 0))
        make_face()
    cong_9_piece_12 = extrude(amount=184.907131441, mode=Mode.PRIVATE)
    cong_9_piece_12 = split(cong_9_piece_12, bisect_by=Plane(origin=(154.356289633, 0.926753128, 0), z_dir=(0, 0, -1)), keep=Keep.TOP, mode=Mode.PRIVATE)
    cong_9_piece_12 = split(cong_9_piece_12, bisect_by=Plane(origin=(56.614850684, 86.354688982, -2.5), z_dir=(-0.7529423951680033, 0.6580864301584333, 0)), keep=Keep.TOP, mode=Mode.PRIVATE)
    add(cong_9_piece_12, mode=Mode.SUBTRACT)


solid = part.part
